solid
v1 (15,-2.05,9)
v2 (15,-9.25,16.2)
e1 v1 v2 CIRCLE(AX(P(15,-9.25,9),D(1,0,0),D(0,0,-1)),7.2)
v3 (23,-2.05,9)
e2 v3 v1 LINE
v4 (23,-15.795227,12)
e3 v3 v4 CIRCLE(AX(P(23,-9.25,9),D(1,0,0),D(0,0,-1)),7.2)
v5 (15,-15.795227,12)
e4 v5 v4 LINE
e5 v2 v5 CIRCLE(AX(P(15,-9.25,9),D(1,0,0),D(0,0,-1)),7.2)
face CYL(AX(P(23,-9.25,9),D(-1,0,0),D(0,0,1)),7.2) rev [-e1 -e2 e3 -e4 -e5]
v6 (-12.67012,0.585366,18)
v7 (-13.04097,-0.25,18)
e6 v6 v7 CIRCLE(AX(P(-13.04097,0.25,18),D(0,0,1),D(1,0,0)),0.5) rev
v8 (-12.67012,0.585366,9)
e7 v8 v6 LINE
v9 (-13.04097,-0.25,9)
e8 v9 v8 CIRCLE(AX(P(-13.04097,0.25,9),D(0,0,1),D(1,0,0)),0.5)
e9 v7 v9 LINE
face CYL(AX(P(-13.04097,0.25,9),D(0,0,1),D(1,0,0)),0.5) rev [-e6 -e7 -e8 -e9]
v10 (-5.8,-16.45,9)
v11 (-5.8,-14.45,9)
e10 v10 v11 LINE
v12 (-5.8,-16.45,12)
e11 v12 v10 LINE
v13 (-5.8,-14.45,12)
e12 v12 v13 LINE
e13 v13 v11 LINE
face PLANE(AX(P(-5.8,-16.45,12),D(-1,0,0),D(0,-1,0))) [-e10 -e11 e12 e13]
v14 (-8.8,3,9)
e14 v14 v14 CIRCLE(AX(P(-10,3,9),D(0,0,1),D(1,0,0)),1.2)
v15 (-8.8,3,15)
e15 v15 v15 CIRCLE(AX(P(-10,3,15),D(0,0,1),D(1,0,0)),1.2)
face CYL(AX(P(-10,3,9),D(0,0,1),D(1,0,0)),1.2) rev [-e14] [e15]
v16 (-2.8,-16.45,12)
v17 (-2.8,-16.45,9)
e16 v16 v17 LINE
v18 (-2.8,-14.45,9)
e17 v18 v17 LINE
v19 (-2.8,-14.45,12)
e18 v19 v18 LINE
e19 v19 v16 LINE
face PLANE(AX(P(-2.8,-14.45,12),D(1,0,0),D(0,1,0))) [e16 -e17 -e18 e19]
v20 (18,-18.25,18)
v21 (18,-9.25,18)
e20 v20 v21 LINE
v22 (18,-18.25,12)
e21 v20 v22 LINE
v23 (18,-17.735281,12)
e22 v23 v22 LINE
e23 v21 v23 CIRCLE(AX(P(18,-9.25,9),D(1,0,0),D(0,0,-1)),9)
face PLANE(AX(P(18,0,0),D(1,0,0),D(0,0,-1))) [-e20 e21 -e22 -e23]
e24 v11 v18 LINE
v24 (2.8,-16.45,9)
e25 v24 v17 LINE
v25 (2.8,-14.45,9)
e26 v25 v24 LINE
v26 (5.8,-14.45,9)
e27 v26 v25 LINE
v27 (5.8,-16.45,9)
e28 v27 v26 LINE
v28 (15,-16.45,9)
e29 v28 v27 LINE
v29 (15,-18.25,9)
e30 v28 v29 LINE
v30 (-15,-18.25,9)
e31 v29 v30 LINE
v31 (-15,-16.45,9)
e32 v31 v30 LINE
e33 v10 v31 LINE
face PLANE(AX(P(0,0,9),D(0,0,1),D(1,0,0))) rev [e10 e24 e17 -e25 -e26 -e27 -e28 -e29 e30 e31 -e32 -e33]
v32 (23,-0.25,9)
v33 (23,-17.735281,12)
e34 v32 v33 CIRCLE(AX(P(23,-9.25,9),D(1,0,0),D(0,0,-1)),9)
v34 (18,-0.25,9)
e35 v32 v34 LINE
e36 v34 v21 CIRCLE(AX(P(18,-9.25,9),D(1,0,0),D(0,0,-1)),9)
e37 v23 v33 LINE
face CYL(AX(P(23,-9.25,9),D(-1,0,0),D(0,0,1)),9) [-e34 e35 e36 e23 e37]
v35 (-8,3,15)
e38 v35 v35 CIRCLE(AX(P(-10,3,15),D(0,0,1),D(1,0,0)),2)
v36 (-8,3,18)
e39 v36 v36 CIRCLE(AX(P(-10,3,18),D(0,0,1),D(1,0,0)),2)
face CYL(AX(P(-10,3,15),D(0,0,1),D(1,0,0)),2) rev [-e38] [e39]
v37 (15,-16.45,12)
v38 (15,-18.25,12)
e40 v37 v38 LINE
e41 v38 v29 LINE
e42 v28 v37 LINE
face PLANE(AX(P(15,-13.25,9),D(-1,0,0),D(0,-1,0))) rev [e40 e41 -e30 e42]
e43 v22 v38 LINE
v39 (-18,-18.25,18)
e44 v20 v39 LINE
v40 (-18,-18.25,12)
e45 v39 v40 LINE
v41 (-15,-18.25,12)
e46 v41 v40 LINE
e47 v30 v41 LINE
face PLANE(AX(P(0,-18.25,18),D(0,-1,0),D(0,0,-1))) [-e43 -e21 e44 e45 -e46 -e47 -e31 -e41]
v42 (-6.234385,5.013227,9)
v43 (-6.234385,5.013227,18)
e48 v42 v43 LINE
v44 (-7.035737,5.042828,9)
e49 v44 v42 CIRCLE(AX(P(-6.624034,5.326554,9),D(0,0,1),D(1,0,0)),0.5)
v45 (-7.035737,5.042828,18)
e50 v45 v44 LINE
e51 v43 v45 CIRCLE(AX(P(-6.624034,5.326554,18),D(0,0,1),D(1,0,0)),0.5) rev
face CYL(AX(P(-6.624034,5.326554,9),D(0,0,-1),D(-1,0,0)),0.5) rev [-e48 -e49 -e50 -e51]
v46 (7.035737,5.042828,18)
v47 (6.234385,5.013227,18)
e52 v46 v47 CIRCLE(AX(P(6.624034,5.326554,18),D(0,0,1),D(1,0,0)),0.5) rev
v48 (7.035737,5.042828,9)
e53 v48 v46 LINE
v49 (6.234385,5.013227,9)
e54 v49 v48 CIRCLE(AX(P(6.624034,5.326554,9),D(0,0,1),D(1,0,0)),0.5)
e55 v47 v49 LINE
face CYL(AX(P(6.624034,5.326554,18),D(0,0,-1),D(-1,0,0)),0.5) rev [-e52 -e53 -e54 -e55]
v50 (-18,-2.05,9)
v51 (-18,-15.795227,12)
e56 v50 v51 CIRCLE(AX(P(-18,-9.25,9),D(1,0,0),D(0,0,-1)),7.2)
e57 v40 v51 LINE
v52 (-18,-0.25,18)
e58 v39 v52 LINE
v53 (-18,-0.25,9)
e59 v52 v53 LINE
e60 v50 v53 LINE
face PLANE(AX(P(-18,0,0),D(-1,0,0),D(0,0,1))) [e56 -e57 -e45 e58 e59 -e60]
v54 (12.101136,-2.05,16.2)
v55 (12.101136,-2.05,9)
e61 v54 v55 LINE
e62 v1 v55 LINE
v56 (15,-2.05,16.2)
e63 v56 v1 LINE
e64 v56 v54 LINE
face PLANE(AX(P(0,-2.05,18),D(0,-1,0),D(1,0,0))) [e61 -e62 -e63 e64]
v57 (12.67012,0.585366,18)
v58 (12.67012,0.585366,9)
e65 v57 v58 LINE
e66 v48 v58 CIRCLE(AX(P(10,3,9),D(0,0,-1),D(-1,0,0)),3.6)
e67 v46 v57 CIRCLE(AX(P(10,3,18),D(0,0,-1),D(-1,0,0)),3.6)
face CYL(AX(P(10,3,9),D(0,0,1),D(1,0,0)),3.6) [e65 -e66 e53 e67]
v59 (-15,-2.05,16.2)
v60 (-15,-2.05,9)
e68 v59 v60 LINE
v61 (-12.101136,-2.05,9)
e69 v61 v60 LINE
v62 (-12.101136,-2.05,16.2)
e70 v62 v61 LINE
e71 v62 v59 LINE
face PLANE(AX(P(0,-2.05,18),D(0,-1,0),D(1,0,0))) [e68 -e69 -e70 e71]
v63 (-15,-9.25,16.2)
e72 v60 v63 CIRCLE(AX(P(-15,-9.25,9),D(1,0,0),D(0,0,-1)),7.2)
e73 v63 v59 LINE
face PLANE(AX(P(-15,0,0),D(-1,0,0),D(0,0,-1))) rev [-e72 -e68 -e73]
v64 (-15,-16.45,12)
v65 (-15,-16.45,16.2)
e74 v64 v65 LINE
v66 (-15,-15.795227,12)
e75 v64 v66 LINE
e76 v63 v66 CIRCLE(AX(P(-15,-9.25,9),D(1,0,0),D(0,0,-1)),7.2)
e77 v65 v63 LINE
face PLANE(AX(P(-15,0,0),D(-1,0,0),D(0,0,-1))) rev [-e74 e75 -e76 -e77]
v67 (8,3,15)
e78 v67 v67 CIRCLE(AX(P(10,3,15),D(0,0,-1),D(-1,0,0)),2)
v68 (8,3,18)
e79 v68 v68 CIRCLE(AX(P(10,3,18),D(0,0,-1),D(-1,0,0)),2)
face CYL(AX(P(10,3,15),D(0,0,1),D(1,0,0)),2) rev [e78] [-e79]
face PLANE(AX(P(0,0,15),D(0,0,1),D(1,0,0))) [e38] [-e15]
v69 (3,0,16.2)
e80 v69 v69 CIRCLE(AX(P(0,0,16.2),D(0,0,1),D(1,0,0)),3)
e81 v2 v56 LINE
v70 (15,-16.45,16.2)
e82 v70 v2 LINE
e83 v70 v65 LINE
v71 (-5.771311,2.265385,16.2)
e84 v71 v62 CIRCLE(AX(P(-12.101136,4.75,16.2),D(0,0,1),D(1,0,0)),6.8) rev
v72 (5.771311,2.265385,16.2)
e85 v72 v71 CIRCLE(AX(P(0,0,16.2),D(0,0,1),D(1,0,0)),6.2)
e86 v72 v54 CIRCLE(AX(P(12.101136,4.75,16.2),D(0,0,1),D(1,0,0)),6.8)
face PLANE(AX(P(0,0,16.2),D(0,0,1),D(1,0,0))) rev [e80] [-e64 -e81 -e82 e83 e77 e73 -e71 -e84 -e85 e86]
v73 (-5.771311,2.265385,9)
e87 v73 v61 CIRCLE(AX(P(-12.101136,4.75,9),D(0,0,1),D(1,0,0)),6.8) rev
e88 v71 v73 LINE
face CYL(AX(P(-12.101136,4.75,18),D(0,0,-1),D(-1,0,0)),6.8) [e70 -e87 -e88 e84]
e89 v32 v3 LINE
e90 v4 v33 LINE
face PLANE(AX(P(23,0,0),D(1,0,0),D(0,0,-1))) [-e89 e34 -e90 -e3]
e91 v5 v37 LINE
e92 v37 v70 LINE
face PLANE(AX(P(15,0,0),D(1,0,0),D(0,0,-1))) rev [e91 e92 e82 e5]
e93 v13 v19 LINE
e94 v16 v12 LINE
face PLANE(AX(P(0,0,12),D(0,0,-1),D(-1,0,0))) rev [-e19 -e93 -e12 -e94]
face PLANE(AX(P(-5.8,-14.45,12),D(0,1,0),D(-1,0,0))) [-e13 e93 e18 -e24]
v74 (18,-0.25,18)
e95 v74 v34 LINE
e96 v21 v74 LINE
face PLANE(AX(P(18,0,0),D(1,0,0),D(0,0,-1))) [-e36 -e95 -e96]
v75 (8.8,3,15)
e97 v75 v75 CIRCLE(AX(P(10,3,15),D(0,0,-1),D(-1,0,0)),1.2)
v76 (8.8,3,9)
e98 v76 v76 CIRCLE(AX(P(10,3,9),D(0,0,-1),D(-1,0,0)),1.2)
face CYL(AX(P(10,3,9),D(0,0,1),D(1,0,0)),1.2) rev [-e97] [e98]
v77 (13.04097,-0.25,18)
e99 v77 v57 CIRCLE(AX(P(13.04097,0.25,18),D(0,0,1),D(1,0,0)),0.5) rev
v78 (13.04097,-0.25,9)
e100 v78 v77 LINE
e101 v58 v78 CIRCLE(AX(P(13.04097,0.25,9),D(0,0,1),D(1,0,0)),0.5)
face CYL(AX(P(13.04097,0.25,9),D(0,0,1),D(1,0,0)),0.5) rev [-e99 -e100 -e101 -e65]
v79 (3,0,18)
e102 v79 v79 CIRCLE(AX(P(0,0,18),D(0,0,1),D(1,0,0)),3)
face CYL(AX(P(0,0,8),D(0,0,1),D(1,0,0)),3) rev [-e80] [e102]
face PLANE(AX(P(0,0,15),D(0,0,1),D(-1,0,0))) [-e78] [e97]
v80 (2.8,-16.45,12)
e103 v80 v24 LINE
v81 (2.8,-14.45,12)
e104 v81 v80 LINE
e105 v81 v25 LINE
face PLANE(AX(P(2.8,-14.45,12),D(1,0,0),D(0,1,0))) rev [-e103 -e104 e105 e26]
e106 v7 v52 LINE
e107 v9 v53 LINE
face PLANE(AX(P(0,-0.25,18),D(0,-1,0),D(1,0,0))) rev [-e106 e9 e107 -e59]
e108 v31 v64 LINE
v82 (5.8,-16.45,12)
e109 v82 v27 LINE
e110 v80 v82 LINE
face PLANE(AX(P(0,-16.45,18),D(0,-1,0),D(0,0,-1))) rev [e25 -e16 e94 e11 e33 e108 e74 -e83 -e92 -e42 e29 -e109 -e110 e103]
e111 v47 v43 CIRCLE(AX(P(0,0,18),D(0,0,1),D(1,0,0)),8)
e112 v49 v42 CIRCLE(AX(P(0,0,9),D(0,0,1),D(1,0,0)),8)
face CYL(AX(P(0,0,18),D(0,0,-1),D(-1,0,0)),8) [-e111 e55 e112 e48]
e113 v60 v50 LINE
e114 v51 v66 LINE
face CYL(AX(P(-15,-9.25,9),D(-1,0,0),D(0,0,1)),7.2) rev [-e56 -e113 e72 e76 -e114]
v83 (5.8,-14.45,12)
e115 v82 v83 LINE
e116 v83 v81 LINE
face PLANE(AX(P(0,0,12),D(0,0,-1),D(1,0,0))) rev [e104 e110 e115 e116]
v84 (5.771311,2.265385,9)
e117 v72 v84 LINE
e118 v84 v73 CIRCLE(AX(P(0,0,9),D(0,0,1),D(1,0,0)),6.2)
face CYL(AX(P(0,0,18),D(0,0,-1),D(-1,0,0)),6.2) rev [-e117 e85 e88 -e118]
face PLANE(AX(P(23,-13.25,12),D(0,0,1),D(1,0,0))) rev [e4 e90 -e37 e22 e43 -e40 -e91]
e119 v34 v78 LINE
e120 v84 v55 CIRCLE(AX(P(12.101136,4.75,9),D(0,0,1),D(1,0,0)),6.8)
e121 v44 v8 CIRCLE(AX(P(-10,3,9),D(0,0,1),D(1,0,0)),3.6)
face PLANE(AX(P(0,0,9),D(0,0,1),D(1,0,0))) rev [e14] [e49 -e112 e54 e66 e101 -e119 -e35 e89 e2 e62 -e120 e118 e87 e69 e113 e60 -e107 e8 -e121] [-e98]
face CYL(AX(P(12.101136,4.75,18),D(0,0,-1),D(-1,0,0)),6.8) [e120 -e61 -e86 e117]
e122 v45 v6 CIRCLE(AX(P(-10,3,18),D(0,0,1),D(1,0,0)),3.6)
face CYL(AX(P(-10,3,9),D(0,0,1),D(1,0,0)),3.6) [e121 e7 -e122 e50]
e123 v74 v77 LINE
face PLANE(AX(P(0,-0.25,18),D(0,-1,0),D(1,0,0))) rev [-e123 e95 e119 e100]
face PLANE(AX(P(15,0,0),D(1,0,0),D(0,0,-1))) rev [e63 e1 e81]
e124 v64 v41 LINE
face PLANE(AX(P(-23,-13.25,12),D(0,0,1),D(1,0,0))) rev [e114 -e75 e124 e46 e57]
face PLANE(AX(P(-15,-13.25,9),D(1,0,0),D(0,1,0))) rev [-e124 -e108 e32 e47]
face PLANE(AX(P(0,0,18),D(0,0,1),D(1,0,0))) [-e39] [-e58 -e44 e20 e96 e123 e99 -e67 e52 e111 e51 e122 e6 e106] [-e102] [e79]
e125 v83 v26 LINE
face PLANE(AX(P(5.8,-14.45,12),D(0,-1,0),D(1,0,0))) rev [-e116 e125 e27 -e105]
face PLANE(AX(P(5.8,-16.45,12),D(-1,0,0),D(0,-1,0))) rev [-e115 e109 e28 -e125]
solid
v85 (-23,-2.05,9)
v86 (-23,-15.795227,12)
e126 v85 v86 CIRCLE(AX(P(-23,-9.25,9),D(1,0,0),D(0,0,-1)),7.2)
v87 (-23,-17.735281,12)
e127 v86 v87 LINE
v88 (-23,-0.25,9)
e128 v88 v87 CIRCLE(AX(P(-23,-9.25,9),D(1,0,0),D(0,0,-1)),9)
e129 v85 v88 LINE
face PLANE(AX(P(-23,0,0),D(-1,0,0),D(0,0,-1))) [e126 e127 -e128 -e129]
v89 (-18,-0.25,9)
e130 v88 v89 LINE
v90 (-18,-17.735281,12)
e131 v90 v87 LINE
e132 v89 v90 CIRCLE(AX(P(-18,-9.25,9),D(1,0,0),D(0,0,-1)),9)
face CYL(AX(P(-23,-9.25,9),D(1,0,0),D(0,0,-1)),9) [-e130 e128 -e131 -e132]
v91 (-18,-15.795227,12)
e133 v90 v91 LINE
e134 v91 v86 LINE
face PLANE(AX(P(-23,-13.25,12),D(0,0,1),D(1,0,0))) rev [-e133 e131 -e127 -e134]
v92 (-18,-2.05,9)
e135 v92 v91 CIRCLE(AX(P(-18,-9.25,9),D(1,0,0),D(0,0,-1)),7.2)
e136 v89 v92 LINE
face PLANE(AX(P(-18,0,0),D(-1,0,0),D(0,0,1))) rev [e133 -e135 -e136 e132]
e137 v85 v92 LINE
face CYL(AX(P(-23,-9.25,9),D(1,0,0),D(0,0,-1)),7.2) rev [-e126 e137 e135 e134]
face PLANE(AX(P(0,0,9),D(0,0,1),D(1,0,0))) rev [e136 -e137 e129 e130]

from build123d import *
from build123d.topology import SkipClean

# Parameters (mm, degrees)
BOSS_EXTRUDE1_DEPTH = 18
SKETCH4_R           = 9
SKETCH4_R_2         = 7.2
BOSS_EXTRUDE2_DEPTH = 5
SPLIT2_START        = -23
SPLIT2_DEPTH        = 5
SPLIT2_START_2      = 18
SPLIT2_2_DEPTH      = 5
SPLIT2_3_DEPTH      = 5
SPLIT2_4_DEPTH      = 5
SHELL1_T            = -1.8
BOSS_EXTRUDE6_DEPTH = 3
SKETCH10_W          = 8
SKETCH10_H          = 3
CUT_EXTRUDE2_DEPTH  = 5
SKETCH11_W          = 3
SKETCH11_H          = 2
BOSS_EXTRUDE5_DEPTH = 3
SKETCH12_R          = 3
CUT_EXTRUDE3_DEPTH  = 10
SKETCH14_R          = 3.6
SKETCH14_R_2        = 1.2
BOSS_EXTRUDE7_DEPTH = 9
SKETCH14_3_R        = 2
SKETCH14_3_R_2      = 1.2
CUT_EXTRUDE4_DEPTH  = 3
FILLET1_R           = 0.5


# Read off the part's stored shape, not the designer's step: Split2
with BuildPart() as part:
    # Sketch1 → Boss-Extrude1 (new body)
    with BuildSketch(Plane.XY):
        with BuildLine():
            Line((-18, -18.25), (18, -18.25))
            Line((18, -18.25), (18, -0.25))
            Line((18, -0.25), (12.10113631, -0.25))
            Line((12.10113631, -0.25), (7.996092796, -0.25))
            ThreePointArc((7.996092796, -0.25), (0, -8), (-7.996092796, -0.25))
            Line((-7.996092796, -0.25), (-12.10113631, -0.25))
            Line((-12.10113631, -0.25), (-18, -0.25))
            Line((-18, -0.25), (-18, -18.25))
        make_face()
        with BuildLine():
            ThreePointArc((-7.996092796, -0.25), (0, -8), (7.996092796, -0.25))
            Line((7.996092796, -0.25), (-7.996092796, -0.25))
        make_face()
        with BuildLine():
            Line((-7.996092796, -0.25), (7.996092796, -0.25))
            ThreePointArc((7.996092796, -0.25), (7.999023139, -0.125015265), (8, 0))
            ThreePointArc((8, 0), (7.86049696, 1.487476905), (7.446853114, 2.923076923))
            ThreePointArc((7.446853114, 2.923076923), (0, 8), (-7.446853114, 2.923076923))
            ThreePointArc((-7.446853114, 2.923076923), (-7.882781799, 1.364460009), (-7.996092796, -0.25))
        make_face()
        with BuildLine():
            Line((7.996092796, -0.25), (12.10113631, -0.25))
            ThreePointArc((12.10113631, -0.25), (9.28463275, 0.618740181), (7.446853114, 2.923076923))
            ThreePointArc((7.446853114, 2.923076923), (7.86049696, 1.487476905), (8, 0))
            ThreePointArc((8, 0), (7.999023139, -0.125015265), (7.996092796, -0.25))
        make_face()
        with BuildLine():
            ThreePointArc((-7.446853114, 2.923076923), (-9.28463275, 0.618740181), (-12.10113631, -0.25))
            Line((-12.10113631, -0.25), (-7.996092796, -0.25))
            ThreePointArc((-7.996092796, -0.25), (-7.882781799, 1.364460009), (-7.446853114, 2.923076923))
        make_face()
    extrude(amount=BOSS_EXTRUDE1_DEPTH)

    # Sketch4 → Boss-Extrude2 (add)
    with BuildSketch(Plane(origin=(18, 0, 0), x_dir=(0, 0, -1), z_dir=(1, 0, 0))):
        with Locations((-9, -9.25)):
            Circle(SKETCH4_R)
        with Locations((-9, -9.25)):
            Circle(SKETCH4_R_2, mode=Mode.SUBTRACT)
    boss_extrude2 = extrude(amount=BOSS_EXTRUDE2_DEPTH)

    # Mirror1: Boss-Extrude2 across plane
    add(boss_extrude2.mirror(Plane(origin=(0, 0, 0), x_dir=(0, 0, 1), z_dir=(1, 0, 0))))


with BuildPart() as body_2:
    # Split1: the piece on the far side of the plane
    add(part.part)
    split(bisect_by=Plane.XY.offset(9), keep=Keep.BOTTOM)


with BuildPart() as part_1:
    add(part.part)

    # Split1
    split(bisect_by=Plane.XY.offset(9), keep=Keep.TOP)

    # Split2 3 outline → Split2 3 (cut)
    with BuildSketch(Plane.YZ.offset(SPLIT2_START)):
        with BuildLine():
            Line((-18.25, 9), (-16.45, 9))
            ThreePointArc((-16.45, 9), (-9.25, 16.2), (-2.05, 9))
            Line((-2.05, 9), (-0.25, 9))
            ThreePointArc((-0.25, 9), (-9.25, 18), (-18.25, 9))
        make_face()
    extrude(amount=SPLIT2_3_DEPTH, mode=Mode.SUBTRACT)

    # Split2 4 outline → Split2 4 (cut)
    with BuildSketch(Plane.YZ.offset(SPLIT2_START_2)):
        with BuildLine():
            Line((-18.25, 9), (-16.45, 9))
            ThreePointArc((-16.45, 9), (-9.25, 16.2), (-2.05, 9))
            Line((-2.05, 9), (-0.25, 9))
            ThreePointArc((-0.25, 9), (-9.25, 18), (-18.25, 9))
        make_face()
    extrude(amount=SPLIT2_4_DEPTH, mode=Mode.SUBTRACT)

    # Shell1
    shell1_openings = [part_1.faces().sort_by_distance(p)[0] for p in [
        (18, -9.25, 13.5),
        (-18, -9.25, 13.5),
        (0, -7.45255142, 9),
    ]]
    offset(amount=SHELL1_T, openings=shell1_openings, kind=Kind.INTERSECTION)



with BuildPart() as body_2_2:
    # Split2 outline → Split2 (new body)
    with BuildSketch(Plane.YZ.offset(SPLIT2_START)):
        with BuildLine():
            Line((-2.05, 9), (-0.25, 9))
            ThreePointArc((-0.25, 9), (-9.25, 18), (-18.25, 9))
            Line((-18.25, 9), (-16.45, 9))
            ThreePointArc((-16.45, 9), (-9.25, 16.2), (-2.05, 9))
        make_face()
    extrude(amount=SPLIT2_DEPTH)


with BuildPart() as body_3:
    # Split2 2 outline → Split2 2 (new body)
    with BuildSketch(Plane.YZ.offset(SPLIT2_START_2)):
        with BuildLine():
            Line((-18.25, 9), (-16.45, 9))
            ThreePointArc((-16.45, 9), (-9.25, 16.2), (-2.05, 9))
            Line((-2.05, 9), (-0.25, 9))
            ThreePointArc((-0.25, 9), (-9.25, 18), (-18.25, 9))
        make_face()
    extrude(amount=SPLIT2_2_DEPTH)


with BuildPart() as part_2:
    with SkipClean():  # the faces are left unmerged after this step: merging them gives an invalid solid
        add(part_1.part)

        add(body_3.part)  # Boss-Extrude6 merges body 3
        # Sketch13 → Boss-Extrude6 (add)
        with BuildSketch(Plane(origin=(18, 0, 0), x_dir=(0, 0, -1), z_dir=(1, 0, 0))):
            with BuildLine():
                ThreePointArc((-16.2, -3.85), (-15.363961031, -2.886038969), (-14.4, -2.05))
                Line((-14.4, -2.05), (-16.2, -2.05))
                Line((-16.2, -2.05), (-16.2, -3.85))
            make_face()
            with BuildLine():
                ThreePointArc((-16.2, -9.25), (-14.091168825, -4.158831175), (-9, -2.05))
                Line((-9, -2.05), (-14.4, -2.05))
                ThreePointArc((-14.4, -2.05), (-15.363961031, -2.886038969), (-16.2, -3.85))
                Line((-16.2, -3.85), (-16.2, -9.25))
            make_face()
            with BuildLine():
                Line((-14.4, -16.45), (-9, -16.45))
                ThreePointArc((-9, -16.45), (-14.091168825, -14.341168825), (-16.2, -9.25))
                Line((-16.2, -9.25), (-16.2, -14.65))
                ThreePointArc((-16.2, -14.65), (-15.363961031, -15.613961031), (-14.4, -16.45))
            make_face()
            with BuildLine():
                ThreePointArc((-14.4, -16.45), (-15.363961031, -15.613961031), (-16.2, -14.65))
                Line((-16.2, -14.65), (-16.2, -16.45))
                Line((-16.2, -16.45), (-14.4, -16.45))
            make_face()
        boss_extrude6 = extrude(amount=-BOSS_EXTRUDE6_DEPTH)

    # Mirror2: Boss-Extrude6 across plane
    with SkipClean():  # the faces are left unmerged after this step: merging them gives an invalid solid
        add(boss_extrude6.mirror(Plane(origin=(0, 0, 0), x_dir=(0, 0, 1), z_dir=(1, 0, 0))))


with BuildPart() as cut_extrude2_tool:
    # Sketch10 → Cut-Extrude2 (new body)
    with SkipClean():  # the faces are left unmerged after this step: merging them gives an invalid solid
        with BuildSketch(Plane.XZ.offset(18.25)):
            with Locations((-19, 10.5)):
                Rectangle(SKETCH10_W, SKETCH10_H)
            with Locations((19, 10.5)):
                Rectangle(SKETCH10_W, SKETCH10_H)
        extrude(amount=-CUT_EXTRUDE2_DEPTH)


with BuildPart() as part_3:
    with SkipClean():  # the faces are left unmerged after this step: merging them gives an invalid solid
        add(part_2.part)

        # Cut-Extrude2: cut by cut_extrude2_tool
        add(cut_extrude2_tool.part, mode=Mode.SUBTRACT)

    # Sketch11 → Boss-Extrude5 (add)
    with SkipClean():  # the faces are left unmerged after this step: merging them gives an invalid solid
        with BuildSketch(Plane(origin=(0, 0, 9), x_dir=(-1, 0, 0), z_dir=(0, 0, -1))):
            with Locations((4.3, -15.45)):
                Rectangle(SKETCH11_W, SKETCH11_H)
        boss_extrude5 = extrude(amount=-BOSS_EXTRUDE5_DEPTH)

    # Mirror8: Boss-Extrude5 across plane
    with SkipClean():  # the faces are left unmerged after this step: merging them gives an invalid solid
        add(boss_extrude5.mirror(Plane(origin=(0, 0, 0), x_dir=(0, 0, 1), z_dir=(1, 0, 0))))

    # Sketch12 → Cut-Extrude3 (cut)
    # profile 1 of 2: a face of its own
    with SkipClean():  # the faces are left unmerged after this step: merging them gives an invalid solid
        with BuildSketch(Plane.XY.offset(18)):
            Circle(SKETCH12_R)
            Polygon((2, 0), (1, 1.732050808), (-1, 1.732050808), (-2, 0), (-1, -1.732050808), (1, -1.732050808), align=None, mode=Mode.SUBTRACT)
        # profile 2 of 2: a face of its own
        with BuildSketch(Plane.XY.offset(18)):
            Polygon((1, -1.732050808), (2, 0), (1, 1.732050808), (-1, 1.732050808), (-2, 0), (-1, -1.732050808), align=None)
        extrude(amount=-CUT_EXTRUDE3_DEPTH, mode=Mode.SUBTRACT)

    # Sketch14 → Boss-Extrude7 (add)
    with SkipClean():  # the faces are left unmerged after this step: merging them gives an invalid solid
        with BuildSketch(Plane.XY.offset(18)):
            with Locations((-10, 3)):
                Circle(SKETCH14_R)
            with Locations((-10, 3)):
                Circle(SKETCH14_R_2, mode=Mode.SUBTRACT)
        boss_extrude7 = extrude(amount=-BOSS_EXTRUDE7_DEPTH)

    # Sketch14<3> → Cut-Extrude4 (cut)
    with SkipClean():  # the faces are left unmerged after this step: merging them gives an invalid solid
        with BuildSketch(Plane.XY.offset(18)):
            with Locations((-10, 3)):
                Circle(SKETCH14_3_R)
            with Locations((-10, 3)):
                Circle(SKETCH14_3_R_2, mode=Mode.SUBTRACT)
        cut_extrude4 = extrude(amount=-CUT_EXTRUDE4_DEPTH, mode=Mode.SUBTRACT)

    # Mirror9: Boss-Extrude7, Cut-Extrude4 across plane
    with SkipClean():  # the faces are left unmerged after this step: merging them gives an invalid solid
        add(boss_extrude7.mirror(Plane(origin=(0, 0, 0), x_dir=(0, 0, 1), z_dir=(1, 0, 0))))
        add(cut_extrude4.mirror(Plane(origin=(0, 0, 0), x_dir=(0, 0, 1), z_dir=(1, 0, 0))), mode=Mode.SUBTRACT)

    # Fillet1
    # the kernel refuses this fillet: 0.5 mm, written as the material it adds along each edge
    with BuildSketch(Plane(origin=(-11.600134445, -0.224836392, 18), x_dir=(-0.9998475289118255, -0.017461927983941913, 0), z_dir=(0, 0, -1))) as fillet1_piece_1:
        with BuildLine():
            CenterArc((1.43232455, 0.499923764), FILLET1_R, 138.876982159, 132.123563468)
            Line((1.05567493, 0.828762728), (1.018009968, 0.861646624))
            ThreePointArc((1.018009968, 0.861646624), (0.535925496, 0.40407886), (-0.02300281, 0.04439449))
            Line((-0.02300281, 0.04439449), (-0.004140552, -0.049828263))
            ThreePointArc((-0.004140552, -0.049828263), (0.502237978, -0.066403689), (1.441928611, -0.049992376))
            Line((1.441928611, -0.049992376), (1.441055514, 0))
        make_face()
    extrude(amount=9)
    with BuildSketch(Plane(origin=(-6.682571593, 4.398094691, 18), x_dir=(0.5888742220615208, 0.8082246906593726, 0), z_dir=(0, 0, -1))) as fillet1_piece_2:
        with BuildLine():
            CenterArc((0.784874944, -0.499433997), FILLET1_R, 92.72648474, 106.623608355)
            ThreePointArc((0.313119131, -0.665103707), (0.173580894, -0.324538512), (0, 0))
            ThreePointArc((0, 0), (0.380545427, -0.009056052), (0.761090855, 0))
        make_face()
    extrude(amount=9)
    with BuildSketch(Plane(origin=(11.600134445, -0.224836392, 18), x_dir=(0.9998475289118255, -0.01746192798394126, 0), z_dir=(0, 0, -1))) as fillet1_piece_3:
        with BuildLine():
            CenterArc((1.43232455, -0.499923764), FILLET1_R, 88.999454372, 132.123563468)
            Line((1.05567493, -0.828762728), (1.018009968, -0.861646624))
            ThreePointArc((1.018009968, -0.861646624), (0.535925496, -0.40407886), (-0.02300281, -0.04439449))
            Line((-0.02300281, -0.04439449), (-0.004140552, 0.049828263))
            ThreePointArc((-0.004140552, 0.049828263), (0.502237978, 0.066403689), (1.441928611, 0.049992376))
            Line((1.441928611, 0.049992376), (1.441055514, 0))
        make_face()
    extrude(amount=9)
    with BuildSketch(Plane(origin=(6.682571593, 4.39809469, 18), x_dir=(-0.5888742220569161, 0.8082246906627277, 0), z_dir=(0, 0, -1))) as fillet1_piece_4:
        with BuildLine():
            CenterArc((0.784874944, 0.499433997), FILLET1_R, 160.649906904, 106.623608356)
            ThreePointArc((0.313119131, 0.665103707), (0.173580894, 0.324538512), (0, 0))
            ThreePointArc((0, 0), (0.380545427, 0.009056052), (0.761090855, 0))
        make_face()
    extrude(amount=9)


with BuildPart() as body_2_2_1:
    with SkipClean():  # the faces are left unmerged after this step: merging them gives an invalid solid
        add(body_2_2.part)

        # Cut-Extrude2: cut by cut_extrude2_tool
        add(cut_extrude2_tool.part, mode=Mode.SUBTRACT)


solid = Compound([part_3.part, body_2_2_1.part])
